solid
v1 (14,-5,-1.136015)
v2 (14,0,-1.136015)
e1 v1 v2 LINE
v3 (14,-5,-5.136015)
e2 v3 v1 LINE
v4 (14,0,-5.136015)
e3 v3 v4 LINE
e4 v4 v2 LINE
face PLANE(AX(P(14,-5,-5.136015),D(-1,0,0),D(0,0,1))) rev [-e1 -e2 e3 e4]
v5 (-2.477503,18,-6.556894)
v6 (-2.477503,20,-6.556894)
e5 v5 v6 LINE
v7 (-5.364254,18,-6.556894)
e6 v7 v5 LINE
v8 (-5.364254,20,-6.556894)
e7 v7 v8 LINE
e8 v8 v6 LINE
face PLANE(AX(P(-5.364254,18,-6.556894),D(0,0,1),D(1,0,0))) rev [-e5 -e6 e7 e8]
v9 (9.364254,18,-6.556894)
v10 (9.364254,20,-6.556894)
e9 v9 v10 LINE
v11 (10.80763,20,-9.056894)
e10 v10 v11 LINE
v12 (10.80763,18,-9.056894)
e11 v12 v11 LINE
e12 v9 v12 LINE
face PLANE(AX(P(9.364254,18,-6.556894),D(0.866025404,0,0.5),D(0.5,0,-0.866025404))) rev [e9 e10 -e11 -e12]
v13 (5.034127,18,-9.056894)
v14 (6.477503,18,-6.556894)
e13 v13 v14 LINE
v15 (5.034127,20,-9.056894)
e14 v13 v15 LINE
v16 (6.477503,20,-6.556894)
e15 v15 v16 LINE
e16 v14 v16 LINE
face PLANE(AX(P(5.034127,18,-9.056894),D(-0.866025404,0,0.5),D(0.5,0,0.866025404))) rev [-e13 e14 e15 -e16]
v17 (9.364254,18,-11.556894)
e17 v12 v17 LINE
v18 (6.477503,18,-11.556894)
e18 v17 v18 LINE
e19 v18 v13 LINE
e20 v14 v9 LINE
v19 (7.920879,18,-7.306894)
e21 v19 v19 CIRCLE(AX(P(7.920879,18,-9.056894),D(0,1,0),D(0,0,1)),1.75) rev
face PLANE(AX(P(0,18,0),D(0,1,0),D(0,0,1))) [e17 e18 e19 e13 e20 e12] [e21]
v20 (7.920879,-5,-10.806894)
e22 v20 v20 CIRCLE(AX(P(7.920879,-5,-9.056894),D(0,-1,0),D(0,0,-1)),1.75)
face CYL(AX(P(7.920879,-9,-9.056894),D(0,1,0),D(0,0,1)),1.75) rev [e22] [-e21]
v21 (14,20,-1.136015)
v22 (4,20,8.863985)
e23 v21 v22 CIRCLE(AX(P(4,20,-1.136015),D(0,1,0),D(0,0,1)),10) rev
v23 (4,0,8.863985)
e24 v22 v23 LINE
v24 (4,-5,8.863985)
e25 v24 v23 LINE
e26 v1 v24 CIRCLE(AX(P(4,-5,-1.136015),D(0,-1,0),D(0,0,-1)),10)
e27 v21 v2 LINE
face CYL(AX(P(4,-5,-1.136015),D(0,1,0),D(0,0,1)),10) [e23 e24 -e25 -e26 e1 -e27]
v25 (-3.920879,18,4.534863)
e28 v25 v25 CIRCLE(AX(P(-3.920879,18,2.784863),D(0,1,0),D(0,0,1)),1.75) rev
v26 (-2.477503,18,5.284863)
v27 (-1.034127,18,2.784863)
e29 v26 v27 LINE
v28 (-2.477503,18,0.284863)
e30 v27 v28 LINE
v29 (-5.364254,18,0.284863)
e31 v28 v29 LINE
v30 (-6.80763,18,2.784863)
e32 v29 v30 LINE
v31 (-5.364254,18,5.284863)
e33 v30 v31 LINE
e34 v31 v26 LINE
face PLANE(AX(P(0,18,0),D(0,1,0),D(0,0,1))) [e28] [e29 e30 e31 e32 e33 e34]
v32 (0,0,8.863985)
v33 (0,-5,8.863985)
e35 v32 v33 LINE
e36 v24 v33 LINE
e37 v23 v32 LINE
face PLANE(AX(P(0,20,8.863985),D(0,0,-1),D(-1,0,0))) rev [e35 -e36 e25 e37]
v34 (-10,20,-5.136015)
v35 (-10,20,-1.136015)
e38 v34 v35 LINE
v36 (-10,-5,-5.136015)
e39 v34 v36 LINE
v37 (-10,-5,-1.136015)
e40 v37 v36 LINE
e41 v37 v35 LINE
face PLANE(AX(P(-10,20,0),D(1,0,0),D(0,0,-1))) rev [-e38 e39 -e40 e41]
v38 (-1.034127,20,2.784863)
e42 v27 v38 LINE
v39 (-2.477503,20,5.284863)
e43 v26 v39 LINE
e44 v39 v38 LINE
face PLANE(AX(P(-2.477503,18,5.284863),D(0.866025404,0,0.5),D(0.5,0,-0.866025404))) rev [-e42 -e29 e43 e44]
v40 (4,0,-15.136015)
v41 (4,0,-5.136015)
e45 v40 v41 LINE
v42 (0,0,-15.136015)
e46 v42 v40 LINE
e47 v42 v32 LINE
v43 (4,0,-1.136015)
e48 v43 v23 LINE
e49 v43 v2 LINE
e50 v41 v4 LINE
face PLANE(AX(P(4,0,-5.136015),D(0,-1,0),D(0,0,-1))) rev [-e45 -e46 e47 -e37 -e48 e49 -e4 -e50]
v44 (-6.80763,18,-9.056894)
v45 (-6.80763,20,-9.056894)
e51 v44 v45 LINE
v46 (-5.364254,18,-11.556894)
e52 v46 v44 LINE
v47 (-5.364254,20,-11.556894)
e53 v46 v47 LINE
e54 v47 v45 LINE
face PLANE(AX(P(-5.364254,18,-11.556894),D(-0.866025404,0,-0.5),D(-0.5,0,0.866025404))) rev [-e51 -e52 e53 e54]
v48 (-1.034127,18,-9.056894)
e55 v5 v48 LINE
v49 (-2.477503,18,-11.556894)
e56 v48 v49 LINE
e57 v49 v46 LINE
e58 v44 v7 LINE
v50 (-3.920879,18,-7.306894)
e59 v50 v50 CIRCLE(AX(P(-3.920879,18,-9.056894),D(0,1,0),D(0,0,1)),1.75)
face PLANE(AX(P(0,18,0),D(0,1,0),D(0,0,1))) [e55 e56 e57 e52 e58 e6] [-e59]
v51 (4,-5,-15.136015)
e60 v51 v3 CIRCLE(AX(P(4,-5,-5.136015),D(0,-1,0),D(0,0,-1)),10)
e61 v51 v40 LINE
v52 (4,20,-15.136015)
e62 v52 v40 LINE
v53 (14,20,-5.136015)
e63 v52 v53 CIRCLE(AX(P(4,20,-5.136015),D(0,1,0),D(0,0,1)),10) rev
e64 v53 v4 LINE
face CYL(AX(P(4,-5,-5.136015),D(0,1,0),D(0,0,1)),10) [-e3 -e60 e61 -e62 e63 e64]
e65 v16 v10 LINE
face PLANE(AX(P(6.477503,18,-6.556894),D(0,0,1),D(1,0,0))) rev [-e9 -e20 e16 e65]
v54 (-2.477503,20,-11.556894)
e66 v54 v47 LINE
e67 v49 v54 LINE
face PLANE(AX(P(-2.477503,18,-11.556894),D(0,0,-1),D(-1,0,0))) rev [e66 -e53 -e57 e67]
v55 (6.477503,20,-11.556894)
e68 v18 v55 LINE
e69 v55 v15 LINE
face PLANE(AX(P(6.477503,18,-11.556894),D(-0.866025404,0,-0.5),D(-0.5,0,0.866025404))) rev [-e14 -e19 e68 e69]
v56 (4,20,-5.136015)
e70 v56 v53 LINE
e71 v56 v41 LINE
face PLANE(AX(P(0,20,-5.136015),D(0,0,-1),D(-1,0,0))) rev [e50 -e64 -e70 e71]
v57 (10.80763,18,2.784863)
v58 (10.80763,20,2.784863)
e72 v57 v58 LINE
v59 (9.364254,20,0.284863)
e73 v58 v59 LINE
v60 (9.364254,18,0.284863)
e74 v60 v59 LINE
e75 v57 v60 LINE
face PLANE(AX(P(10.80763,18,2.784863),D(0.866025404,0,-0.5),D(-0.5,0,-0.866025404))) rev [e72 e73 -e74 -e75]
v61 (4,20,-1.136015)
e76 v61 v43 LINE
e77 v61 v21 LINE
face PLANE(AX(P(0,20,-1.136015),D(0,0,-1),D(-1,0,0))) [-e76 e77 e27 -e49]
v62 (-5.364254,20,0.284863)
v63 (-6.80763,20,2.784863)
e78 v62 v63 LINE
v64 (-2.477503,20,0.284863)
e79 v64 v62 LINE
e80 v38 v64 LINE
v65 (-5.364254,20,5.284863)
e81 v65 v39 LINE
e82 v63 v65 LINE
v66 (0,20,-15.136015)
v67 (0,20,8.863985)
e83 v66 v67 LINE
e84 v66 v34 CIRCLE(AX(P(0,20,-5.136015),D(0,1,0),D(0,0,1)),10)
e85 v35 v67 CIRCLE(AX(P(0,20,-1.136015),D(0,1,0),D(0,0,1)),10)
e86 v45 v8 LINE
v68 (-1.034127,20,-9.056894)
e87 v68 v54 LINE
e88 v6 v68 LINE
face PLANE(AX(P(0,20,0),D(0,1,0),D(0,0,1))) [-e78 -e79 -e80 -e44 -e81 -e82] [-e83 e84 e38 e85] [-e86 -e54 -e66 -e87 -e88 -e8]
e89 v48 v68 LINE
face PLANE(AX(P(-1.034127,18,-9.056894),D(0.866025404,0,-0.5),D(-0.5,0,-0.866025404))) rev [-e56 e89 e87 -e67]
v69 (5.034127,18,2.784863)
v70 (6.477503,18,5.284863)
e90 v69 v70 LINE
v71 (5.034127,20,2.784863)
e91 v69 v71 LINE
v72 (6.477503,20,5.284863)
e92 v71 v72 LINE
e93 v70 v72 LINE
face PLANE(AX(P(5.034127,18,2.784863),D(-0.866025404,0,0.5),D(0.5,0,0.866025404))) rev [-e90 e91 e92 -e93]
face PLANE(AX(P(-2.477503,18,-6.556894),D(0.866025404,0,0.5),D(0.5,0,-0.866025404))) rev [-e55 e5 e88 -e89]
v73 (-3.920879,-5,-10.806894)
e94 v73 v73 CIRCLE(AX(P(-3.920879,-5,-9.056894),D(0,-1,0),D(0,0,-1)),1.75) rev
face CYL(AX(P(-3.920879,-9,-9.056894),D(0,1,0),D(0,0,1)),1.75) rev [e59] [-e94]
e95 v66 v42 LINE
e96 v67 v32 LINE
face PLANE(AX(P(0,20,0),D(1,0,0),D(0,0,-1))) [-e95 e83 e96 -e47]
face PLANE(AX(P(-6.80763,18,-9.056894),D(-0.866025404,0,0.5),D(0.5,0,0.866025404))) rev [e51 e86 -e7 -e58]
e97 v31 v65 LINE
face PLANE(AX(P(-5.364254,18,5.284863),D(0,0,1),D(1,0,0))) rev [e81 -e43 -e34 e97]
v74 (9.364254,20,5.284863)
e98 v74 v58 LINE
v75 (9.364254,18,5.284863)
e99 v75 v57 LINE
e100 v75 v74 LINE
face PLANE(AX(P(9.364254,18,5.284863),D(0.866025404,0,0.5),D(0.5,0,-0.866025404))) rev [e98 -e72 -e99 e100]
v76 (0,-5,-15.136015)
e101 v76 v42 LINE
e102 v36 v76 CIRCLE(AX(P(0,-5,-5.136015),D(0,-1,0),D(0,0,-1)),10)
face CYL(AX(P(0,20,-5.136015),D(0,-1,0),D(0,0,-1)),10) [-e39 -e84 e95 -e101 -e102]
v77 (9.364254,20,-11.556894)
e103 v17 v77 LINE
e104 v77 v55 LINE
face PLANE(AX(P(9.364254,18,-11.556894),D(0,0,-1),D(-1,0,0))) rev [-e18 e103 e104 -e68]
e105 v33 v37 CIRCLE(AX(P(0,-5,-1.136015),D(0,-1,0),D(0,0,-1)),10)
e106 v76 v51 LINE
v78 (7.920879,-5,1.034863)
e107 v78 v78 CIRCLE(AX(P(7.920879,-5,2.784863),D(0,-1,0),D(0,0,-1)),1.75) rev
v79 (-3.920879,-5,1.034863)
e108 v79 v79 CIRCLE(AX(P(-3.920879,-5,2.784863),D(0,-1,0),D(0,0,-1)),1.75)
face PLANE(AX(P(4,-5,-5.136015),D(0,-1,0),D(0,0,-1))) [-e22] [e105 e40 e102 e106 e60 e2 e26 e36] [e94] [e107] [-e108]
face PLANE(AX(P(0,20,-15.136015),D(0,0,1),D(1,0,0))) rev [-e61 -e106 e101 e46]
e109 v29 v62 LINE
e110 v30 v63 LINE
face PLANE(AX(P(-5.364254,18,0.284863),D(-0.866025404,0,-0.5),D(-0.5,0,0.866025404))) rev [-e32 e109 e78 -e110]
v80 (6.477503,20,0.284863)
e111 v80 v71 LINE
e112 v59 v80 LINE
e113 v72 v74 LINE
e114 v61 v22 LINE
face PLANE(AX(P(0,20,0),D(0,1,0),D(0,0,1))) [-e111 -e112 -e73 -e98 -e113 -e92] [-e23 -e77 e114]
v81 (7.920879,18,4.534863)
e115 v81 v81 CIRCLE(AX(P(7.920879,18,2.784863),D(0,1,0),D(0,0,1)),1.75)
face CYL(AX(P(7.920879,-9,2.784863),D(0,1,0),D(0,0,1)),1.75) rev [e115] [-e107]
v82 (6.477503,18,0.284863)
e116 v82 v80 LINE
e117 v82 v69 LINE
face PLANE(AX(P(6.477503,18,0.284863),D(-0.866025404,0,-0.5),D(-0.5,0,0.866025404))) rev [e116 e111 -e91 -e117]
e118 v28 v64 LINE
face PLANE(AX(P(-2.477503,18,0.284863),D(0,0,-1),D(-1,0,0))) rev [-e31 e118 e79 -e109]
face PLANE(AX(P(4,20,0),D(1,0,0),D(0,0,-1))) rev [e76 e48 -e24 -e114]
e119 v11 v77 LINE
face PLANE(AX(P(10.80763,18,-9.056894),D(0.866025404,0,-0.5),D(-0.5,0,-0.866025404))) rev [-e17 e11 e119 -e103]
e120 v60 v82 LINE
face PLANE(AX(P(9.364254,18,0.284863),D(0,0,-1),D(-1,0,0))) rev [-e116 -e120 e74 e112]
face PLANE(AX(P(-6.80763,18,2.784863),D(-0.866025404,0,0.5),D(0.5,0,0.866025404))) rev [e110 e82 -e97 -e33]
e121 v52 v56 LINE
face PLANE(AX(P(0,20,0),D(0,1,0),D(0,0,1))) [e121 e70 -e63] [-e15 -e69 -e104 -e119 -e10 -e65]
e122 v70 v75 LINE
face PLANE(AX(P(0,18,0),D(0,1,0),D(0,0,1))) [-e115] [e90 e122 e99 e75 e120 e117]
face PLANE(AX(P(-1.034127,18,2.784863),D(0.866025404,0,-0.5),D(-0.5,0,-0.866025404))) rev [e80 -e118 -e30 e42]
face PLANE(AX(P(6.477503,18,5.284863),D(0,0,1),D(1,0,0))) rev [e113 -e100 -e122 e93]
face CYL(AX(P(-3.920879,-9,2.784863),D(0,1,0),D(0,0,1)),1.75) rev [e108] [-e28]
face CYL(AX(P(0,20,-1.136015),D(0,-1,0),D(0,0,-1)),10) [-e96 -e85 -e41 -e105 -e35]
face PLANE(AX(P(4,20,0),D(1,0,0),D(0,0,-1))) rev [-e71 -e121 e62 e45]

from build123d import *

# Parameters (mm, degrees)
SKETCH1_W               = 10
SKETCH1_H               = 24
BOSS_EXTRUDE1_DEPTH     = 20
BOSS_EXTRUDE1_2_DEPTH   = 20
BOSS_EXTRUDE1_3_DEPTH   = 20
BOSS_EXTRUDE2_DEPTH     = 5
FILLET1_R               = 10
SKETCH3_R               = 1.75
CUT_EXTRUDE1_DEPTH      = 29
MIRROR2_COPY_1_SKETCH_R = 1.75
MIRROR2_COPY_1_DEPTH    = 29
CUT_EXTRUDE2_DEPTH      = 2


with BuildPart() as part:
    # Sketch1 → Boss-Extrude1 (new body)
    with BuildSketch(Plane(origin=(0, 0, 0), x_dir=(1, 0, 0), z_dir=(0, 1, 0))):
        with Locations((-5, 3.136015275)):
            Rectangle(SKETCH1_W, SKETCH1_H)
    extrude(amount=BOSS_EXTRUDE1_DEPTH)



with BuildPart() as body_2:
    # Sketch1 → Boss-Extrude1 2 (new body)
    with BuildSketch(Plane(origin=(0, 0, 0), x_dir=(1, 0, 0), z_dir=(0, 1, 0))):
        with BuildLine():
            ThreePointArc((14, 1.136015275), (11.071067812, -5.935052537), (4, -8.863984725))
            Line((4, -8.863984725), (4, 1.136015275))
            Line((4, 1.136015275), (14, 1.136015275))
        make_face()
    extrude(amount=BOSS_EXTRUDE1_2_DEPTH)


with BuildPart() as body_3:
    # Sketch1 → Boss-Extrude1 3 (new body)
    with BuildSketch(Plane(origin=(0, 0, 0), x_dir=(1, 0, 0), z_dir=(0, 1, 0))):
        with BuildLine():
            ThreePointArc((4, 15.136015275), (11.071067812, 12.207083087), (14, 5.136015275))
            Line((14, 5.136015275), (4, 5.136015275))
            Line((4, 5.136015275), (4, 15.136015275))
        make_face()
    extrude(amount=BOSS_EXTRUDE1_3_DEPTH)


with BuildPart() as part_1:
    add(part.part)

    add(body_2.part)  # Boss-Extrude2 merges body 2

    add(body_3.part)  # Boss-Extrude2 merges body 3
    # Sketch2 → Boss-Extrude2 (add)
    with BuildSketch(Plane.XZ):
        with BuildLine():
            Line((-10, 8.863984725), (-10, -15.136015275))
            Line((-10, -15.136015275), (0, -15.136015275))
            Line((0, -15.136015275), (4, -15.136015275))
            ThreePointArc((4, -15.136015275), (11.071067812, -12.207083087), (14, -5.136015275))
            Line((14, -5.136015275), (14, -1.136015275))
            ThreePointArc((14, -1.136015275), (11.071067812, 5.935052537), (4, 8.863984725))
            Line((4, 8.863984725), (0, 8.863984725))
            Line((0, 8.863984725), (-10, 8.863984725))
        make_face()
    extrude(amount=BOSS_EXTRUDE2_DEPTH)

    # Fillet1
    fillet1_edges = [part_1.edges().sort_by_distance(p)[0] for p in [
        (-10, 7.5, 8.863984725),
        (-10, 7.5, -15.136015275),
    ]]
    fillet(fillet1_edges, radius=FILLET1_R - 0.0001)  # a hair under: the kernel refuses the full size

    # Sketch3 → Cut-Extrude1 (cut)
    with BuildSketch(Plane(origin=(0, 20, 0), x_dir=(1, 0, 0), z_dir=(0, 1, 0))):
        with Locations(Location((7.920878707, 9.056893982, 0), (0, 0, 270))):
            Circle(SKETCH3_R)
    cut_extrude1 = extrude(amount=-CUT_EXTRUDE1_DEPTH, mode=Mode.SUBTRACT)

    # Mirror1: Cut-Extrude1 across plane
    add(cut_extrude1.mirror(Plane.XY.offset(-3.136015275)), mode=Mode.SUBTRACT)

    # Mirror2: Cut-Extrude1 across plane
    add(cut_extrude1.mirror(Plane(origin=(2, 0, 0), x_dir=(0, 0, 1), z_dir=(1, 0, 0))), mode=Mode.SUBTRACT)

    # Mirror2 copy 1 sketch → Mirror2 copy 1 (cut)
    with BuildSketch(Plane(origin=(4, 20, -6.27203055), x_dir=(-1, 0, 0), z_dir=(0, 1, 0))):
        with Locations(Location((7.920878707, 9.056893982, 0), (0, 0, 270))):
            Circle(MIRROR2_COPY_1_SKETCH_R)
    extrude(amount=-MIRROR2_COPY_1_DEPTH, mode=Mode.SUBTRACT)

    # Sketch4 → Cut-Extrude2 (cut)
    with BuildSketch(Plane(origin=(0, 20, 0), x_dir=(1, 0, 0), z_dir=(0, 1, 0))):
        Polygon((10.807630053, 9.056893982), (9.36425438, 11.556893982), (6.477503035, 11.556893982), (5.034127362, 9.056893982), (6.477503035, 6.556893982), (9.36425438, 6.556893982), align=None)
        Polygon((10.807630053, -2.784863433), (9.36425438, -0.284863433), (6.477503035, -0.284863433), (5.034127362, -2.784863433), (6.477503035, -5.284863433), (9.36425438, -5.284863433), align=None)
        Polygon((-6.807630053, -2.784863433), (-5.36425438, -5.284863433), (-2.477503035, -5.284863433), (-1.034127362, -2.784863433), (-2.477503035, -0.284863433), (-5.36425438, -0.284863433), align=None)
        Polygon((-6.807630053, 9.056893982), (-5.36425438, 6.556893982), (-2.477503035, 6.556893982), (-1.034127362, 9.056893982), (-2.477503035, 11.556893982), (-5.36425438, 11.556893982), align=None)
    extrude(amount=-CUT_EXTRUDE2_DEPTH, mode=Mode.SUBTRACT)


solid = part_1.part
